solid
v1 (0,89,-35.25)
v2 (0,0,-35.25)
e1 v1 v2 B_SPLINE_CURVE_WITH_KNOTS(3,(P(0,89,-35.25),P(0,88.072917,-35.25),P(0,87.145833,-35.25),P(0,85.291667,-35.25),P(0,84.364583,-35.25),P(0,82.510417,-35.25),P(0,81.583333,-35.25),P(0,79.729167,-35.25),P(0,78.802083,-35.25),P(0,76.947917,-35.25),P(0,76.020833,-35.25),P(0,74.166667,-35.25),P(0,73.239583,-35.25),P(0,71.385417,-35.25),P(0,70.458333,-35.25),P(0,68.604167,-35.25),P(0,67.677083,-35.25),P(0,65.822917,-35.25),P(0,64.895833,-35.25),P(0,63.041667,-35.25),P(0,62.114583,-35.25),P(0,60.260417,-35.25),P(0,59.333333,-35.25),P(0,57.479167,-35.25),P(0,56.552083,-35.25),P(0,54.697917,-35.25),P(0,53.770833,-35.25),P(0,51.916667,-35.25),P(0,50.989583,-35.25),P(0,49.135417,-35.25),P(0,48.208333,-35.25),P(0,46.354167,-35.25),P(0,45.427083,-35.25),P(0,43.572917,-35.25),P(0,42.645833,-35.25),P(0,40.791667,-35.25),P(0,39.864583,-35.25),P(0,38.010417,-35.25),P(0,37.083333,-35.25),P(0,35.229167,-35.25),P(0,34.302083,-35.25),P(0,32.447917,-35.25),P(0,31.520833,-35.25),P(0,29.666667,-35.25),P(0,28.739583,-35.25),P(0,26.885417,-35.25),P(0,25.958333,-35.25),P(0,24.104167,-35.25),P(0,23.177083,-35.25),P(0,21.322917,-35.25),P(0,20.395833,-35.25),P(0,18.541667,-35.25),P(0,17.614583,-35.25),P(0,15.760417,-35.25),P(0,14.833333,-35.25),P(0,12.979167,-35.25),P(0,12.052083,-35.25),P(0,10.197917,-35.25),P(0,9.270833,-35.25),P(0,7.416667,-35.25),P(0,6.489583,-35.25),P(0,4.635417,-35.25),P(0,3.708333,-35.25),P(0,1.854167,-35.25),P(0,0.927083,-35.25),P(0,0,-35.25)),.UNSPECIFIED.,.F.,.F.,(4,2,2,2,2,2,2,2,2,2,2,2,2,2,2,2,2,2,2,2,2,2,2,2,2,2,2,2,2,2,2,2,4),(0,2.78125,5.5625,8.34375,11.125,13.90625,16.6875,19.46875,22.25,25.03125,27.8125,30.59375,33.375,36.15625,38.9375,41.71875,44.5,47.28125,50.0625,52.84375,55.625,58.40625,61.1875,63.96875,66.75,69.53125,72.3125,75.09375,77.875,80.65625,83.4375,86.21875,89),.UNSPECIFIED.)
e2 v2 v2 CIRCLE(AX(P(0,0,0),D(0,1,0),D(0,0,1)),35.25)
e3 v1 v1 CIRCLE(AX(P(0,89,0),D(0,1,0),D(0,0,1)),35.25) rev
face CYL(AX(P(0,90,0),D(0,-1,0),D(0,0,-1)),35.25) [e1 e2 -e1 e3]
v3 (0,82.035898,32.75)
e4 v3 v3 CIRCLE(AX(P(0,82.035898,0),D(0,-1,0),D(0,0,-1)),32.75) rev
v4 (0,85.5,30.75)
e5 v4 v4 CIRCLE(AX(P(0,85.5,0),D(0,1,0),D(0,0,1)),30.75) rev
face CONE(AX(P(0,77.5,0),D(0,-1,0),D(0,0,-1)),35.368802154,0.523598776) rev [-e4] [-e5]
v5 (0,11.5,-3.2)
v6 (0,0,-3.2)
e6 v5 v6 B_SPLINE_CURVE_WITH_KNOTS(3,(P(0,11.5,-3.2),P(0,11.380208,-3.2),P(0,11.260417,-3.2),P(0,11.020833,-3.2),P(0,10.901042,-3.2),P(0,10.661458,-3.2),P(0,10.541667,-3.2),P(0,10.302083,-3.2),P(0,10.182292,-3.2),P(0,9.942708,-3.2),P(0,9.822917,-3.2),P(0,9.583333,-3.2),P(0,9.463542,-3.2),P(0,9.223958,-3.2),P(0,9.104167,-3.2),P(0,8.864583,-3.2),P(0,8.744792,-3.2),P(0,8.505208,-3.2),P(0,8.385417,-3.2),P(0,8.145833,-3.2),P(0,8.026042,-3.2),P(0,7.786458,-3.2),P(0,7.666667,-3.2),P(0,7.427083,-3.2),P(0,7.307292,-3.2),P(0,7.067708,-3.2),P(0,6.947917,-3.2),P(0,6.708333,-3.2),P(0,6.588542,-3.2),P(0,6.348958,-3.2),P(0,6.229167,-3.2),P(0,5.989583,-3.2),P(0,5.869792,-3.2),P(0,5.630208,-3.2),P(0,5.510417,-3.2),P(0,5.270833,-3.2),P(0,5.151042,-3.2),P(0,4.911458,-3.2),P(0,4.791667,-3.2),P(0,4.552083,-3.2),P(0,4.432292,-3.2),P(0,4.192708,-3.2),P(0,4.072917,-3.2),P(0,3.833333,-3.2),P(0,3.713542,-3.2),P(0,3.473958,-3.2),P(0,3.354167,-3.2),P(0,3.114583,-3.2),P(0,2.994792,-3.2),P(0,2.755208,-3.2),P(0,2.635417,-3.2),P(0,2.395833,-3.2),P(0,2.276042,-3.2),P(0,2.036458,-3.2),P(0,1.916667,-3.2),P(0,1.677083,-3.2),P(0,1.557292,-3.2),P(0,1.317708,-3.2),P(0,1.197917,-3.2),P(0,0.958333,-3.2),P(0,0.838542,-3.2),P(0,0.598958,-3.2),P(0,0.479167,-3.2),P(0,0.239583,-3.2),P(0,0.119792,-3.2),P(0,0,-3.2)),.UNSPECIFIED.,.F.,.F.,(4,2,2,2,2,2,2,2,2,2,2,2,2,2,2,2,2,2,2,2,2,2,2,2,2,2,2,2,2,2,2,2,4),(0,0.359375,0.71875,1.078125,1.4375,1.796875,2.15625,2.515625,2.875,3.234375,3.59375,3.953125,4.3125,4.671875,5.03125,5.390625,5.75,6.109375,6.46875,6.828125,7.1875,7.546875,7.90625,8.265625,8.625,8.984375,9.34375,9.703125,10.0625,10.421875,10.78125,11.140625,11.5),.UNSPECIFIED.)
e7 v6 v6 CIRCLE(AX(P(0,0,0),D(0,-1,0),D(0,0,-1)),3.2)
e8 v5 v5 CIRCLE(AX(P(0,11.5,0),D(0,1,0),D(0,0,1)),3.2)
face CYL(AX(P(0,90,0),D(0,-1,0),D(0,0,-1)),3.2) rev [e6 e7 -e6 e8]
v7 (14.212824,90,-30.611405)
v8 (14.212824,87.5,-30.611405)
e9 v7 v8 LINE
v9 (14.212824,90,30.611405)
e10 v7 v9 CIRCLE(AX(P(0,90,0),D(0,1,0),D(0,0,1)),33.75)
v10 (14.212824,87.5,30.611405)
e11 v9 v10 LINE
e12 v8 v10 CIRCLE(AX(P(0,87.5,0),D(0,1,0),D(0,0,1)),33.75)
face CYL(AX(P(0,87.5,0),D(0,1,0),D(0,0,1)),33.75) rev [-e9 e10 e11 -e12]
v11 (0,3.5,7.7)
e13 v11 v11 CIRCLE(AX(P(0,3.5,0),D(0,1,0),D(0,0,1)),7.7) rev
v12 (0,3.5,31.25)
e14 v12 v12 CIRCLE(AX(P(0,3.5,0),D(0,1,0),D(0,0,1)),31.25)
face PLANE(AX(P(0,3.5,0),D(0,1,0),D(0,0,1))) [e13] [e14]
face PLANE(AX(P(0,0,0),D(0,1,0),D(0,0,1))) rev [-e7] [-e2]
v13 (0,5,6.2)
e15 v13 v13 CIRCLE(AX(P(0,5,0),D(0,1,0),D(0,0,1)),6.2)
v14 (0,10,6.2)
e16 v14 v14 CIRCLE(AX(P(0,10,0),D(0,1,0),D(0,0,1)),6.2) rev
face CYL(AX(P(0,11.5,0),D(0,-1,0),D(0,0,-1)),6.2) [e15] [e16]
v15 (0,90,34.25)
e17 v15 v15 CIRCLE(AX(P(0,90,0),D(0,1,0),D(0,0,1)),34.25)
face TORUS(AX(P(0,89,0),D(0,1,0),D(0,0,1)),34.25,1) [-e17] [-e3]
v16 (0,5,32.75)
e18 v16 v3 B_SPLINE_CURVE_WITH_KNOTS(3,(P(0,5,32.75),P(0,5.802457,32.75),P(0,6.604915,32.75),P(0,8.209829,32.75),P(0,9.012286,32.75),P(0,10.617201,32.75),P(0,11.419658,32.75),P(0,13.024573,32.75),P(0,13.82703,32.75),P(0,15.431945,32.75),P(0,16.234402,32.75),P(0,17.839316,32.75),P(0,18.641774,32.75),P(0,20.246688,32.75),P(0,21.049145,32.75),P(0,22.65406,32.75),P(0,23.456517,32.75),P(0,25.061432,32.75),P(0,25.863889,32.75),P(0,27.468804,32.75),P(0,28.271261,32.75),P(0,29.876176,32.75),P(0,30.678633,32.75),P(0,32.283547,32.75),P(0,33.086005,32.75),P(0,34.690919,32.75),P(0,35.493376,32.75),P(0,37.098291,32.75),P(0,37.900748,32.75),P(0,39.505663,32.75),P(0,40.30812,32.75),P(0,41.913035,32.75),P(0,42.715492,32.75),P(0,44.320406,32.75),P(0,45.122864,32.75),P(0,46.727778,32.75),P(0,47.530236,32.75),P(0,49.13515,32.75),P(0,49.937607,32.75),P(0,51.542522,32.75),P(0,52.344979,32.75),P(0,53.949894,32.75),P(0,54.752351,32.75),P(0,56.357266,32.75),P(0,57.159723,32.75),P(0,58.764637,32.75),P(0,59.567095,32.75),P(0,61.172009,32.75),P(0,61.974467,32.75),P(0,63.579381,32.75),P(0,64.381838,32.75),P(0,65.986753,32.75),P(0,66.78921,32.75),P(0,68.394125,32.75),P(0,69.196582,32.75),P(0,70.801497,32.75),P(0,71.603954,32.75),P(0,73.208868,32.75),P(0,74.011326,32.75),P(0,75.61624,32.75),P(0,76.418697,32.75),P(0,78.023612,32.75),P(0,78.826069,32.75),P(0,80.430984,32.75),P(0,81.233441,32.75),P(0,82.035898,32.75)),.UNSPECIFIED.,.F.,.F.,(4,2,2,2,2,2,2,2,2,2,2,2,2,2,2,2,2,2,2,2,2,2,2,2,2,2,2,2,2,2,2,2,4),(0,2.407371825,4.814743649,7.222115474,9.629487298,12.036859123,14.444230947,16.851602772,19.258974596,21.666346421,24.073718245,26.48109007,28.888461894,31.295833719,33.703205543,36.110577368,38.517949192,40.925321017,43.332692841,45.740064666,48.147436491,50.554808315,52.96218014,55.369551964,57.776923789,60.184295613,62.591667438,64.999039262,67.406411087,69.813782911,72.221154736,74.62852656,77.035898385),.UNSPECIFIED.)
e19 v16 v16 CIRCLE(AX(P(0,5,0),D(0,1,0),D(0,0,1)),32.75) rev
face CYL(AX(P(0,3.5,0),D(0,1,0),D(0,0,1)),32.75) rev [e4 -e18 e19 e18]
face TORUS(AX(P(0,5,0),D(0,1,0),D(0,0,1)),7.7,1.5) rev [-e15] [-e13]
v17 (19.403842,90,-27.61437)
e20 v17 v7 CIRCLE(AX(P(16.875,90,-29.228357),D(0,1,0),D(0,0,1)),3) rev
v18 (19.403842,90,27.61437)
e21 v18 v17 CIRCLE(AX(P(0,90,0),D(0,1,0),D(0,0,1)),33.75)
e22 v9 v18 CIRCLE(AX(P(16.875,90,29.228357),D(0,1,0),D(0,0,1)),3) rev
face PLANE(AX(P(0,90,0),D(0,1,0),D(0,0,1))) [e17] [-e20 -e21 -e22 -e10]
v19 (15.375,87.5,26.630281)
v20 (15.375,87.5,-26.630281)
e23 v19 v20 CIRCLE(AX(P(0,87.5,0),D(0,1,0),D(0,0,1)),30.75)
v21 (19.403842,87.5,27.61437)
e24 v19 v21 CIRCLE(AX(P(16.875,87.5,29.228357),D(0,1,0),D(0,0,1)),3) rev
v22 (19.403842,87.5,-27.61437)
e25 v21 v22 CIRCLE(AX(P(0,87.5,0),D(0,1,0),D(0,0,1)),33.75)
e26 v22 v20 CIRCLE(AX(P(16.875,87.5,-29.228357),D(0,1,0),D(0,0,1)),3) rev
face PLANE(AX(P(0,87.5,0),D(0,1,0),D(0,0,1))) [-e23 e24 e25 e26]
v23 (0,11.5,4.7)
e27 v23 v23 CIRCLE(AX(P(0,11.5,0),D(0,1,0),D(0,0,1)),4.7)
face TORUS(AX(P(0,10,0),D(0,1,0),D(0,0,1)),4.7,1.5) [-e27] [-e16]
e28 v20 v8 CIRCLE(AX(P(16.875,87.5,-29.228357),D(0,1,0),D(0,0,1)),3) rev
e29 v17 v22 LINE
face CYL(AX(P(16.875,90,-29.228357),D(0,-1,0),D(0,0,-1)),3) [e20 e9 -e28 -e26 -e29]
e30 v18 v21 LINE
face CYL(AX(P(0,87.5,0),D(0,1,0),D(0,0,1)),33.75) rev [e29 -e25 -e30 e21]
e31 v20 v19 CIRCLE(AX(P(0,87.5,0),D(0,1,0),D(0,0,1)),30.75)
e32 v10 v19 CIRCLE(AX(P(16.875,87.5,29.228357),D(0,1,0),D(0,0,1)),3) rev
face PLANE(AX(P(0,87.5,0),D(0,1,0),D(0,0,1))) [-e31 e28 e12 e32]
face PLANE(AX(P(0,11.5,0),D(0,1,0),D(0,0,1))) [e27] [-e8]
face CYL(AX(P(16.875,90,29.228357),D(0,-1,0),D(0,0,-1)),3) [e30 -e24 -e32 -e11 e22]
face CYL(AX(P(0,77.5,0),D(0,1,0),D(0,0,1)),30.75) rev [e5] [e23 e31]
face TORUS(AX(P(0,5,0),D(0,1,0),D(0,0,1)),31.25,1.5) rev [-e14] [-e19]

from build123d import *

# Parameters (mm, degrees)
ESQUISSE1_R             = 35.25
BOSS_EXTRU_1_DEPTH      = 90
CONG_1_R                = 1
ESQUISSE4_R             = 33.75
ENL_V_MAT_EXTRU_3_DEPTH = 2.5
ESQUISSE5_R             = 32.75
ENL_V_MAT_EXTRU_4_DEPTH = 84
ESQUISSE6_R             = 33.75
ESQUISSE6_R_2           = 30.75
BOSS_EXTRU_2_DEPTH      = 10
CHANFREIN1_SIZE         = 8
CHANFREIN1_SIZE_2       = 4.618802154
BOSS_EXTRU_3_START      = 2.5
BOSS_EXTRU_3_DEPTH      = 2.5
ESQUISSE8_R             = 6.2
BOSS_EXTRU_4_DEPTH      = 8
ESQUISSE2_R             = 3.2
ENL_V_MAT_EXTRU_1_DEPTH = 103.884036697
CONG_2_R                = 1.5


with BuildPart() as part:
    # Esquisse1 → Boss.-Extru.1 (new body)
    with BuildSketch(Plane(origin=(0, 0, 0), x_dir=(1, 0, 0), z_dir=(0, 1, 0))):
        with Locations(Location((0, 0, 0), (0, 0, 90))):
            Circle(ESQUISSE1_R)
    extrude(amount=BOSS_EXTRU_1_DEPTH)

    # Congé1
    cong_1_edges = [part.edges().sort_by_distance(p)[0] for p in [
        (0, 90, 35.25),
    ]]
    fillet(cong_1_edges, radius=CONG_1_R)

    # Esquisse4 → Enlèv. mat.-Extru.3 (cut)
    with BuildSketch(Plane(origin=(0, 90, 0), x_dir=(1, 0, 0), z_dir=(0, 1, 0))):
        with Locations(Location((0, 0, 0), (0, 0, 270))):
            Circle(ESQUISSE4_R)
    extrude(amount=-ENL_V_MAT_EXTRU_3_DEPTH, mode=Mode.SUBTRACT)

    # Esquisse5 → Enlèv. mat.-Extru.4 (cut)
    with BuildSketch(Plane(origin=(0, 87.5, 0), x_dir=(1, 0, 0), z_dir=(0, 1, 0))):
        with Locations(Location((0, 0, 0), (0, 0, 270))):
            Circle(ESQUISSE5_R)
    extrude(amount=-ENL_V_MAT_EXTRU_4_DEPTH, mode=Mode.SUBTRACT)

    # Esquisse6 → Boss.-Extru.2 (add)
    with BuildSketch(Plane(origin=(0, 87.5, 0), x_dir=(1, 0, 0), z_dir=(0, 1, 0))):
        with Locations(Location((0, 0, 0), (0, 0, 270))):
            Circle(ESQUISSE6_R)
        with Locations(Location((0, 0, 0), (0, 0, 270))):
            Circle(ESQUISSE6_R_2, mode=Mode.SUBTRACT)
    extrude(amount=-BOSS_EXTRU_2_DEPTH)

    # Chanfrein1
    # the kernel refuses this chamfer: 8, 4.618802154 mm, written as the material it takes off along each edge
    with BuildSketch(Plane(origin=(0, 77.5, 0), x_dir=(0, 0, 1), z_dir=(-1, 0, 0))) as chanfrein1_piece_1_section:
        Polygon((30.75, CHANFREIN1_SIZE), (30.75 + CHANFREIN1_SIZE_2, 0), (30.75, 0), align=None)
    chanfrein1_piece_1 = revolve(axis=Axis((0, 77.5, 0), (0, 1, 0)), mode=Mode.PRIVATE)
    chanfrein1_piece_1 = chanfrein1_piece_1 & Plane(origin=(0, 83.835682002, 0), x_dir=(0, 0, 1), z_dir=(0, 1, 0)) * Cylinder(32.75, 142, mode=Mode.PRIVATE)
    add(chanfrein1_piece_1, mode=Mode.SUBTRACT)

    # Esquisse7 → Boss.-Extru.3 (add)
    with BuildSketch(Plane(origin=(0, 87.5, 0), x_dir=(1, 0, 0), z_dir=(0, 1, 0)).offset(BOSS_EXTRU_3_START)):
        with BuildLine():
            ThreePointArc((14.212824392, 30.61140511), (15.375, 26.630281166), (19.403842275, 27.614369538))
            ThreePointArc((19.403842275, 27.614369538), (16.875, 29.228357378), (14.212824392, 30.61140511))
        make_face()
        with BuildLine():
            ThreePointArc((14.212824392, -30.61140511), (16.875, -29.228357378), (19.403842275, -27.614369538))
            ThreePointArc((19.403842275, -27.614369538), (15.375, -26.630281166), (14.212824392, -30.61140511))
        make_face()
    extrude(amount=-BOSS_EXTRU_3_DEPTH)

    # Esquisse8 → Boss.-Extru.4 (add)
    with BuildSketch(Plane(origin=(0, 3.5, 0), x_dir=(1, 0, 0), z_dir=(0, 1, 0))):
        with Locations(Location((0, 0, 0), (0, 0, 270))):
            Circle(ESQUISSE8_R)
    extrude(amount=BOSS_EXTRU_4_DEPTH)

    # Esquisse2 → Enlèv. mat.-Extru.1 (cut, through all)
    with BuildSketch(Plane.XZ):
        with Locations(Location((0, 0, 0), (0, 0, 270))):
            Circle(ESQUISSE2_R)
    extrude(amount=-ENL_V_MAT_EXTRU_1_DEPTH, mode=Mode.SUBTRACT)

    # Congé2
    cong_2_edges = [part.edges().sort_by_distance(p)[0] for p in [
        (0, 3.5, -32.75),
        (0, 3.5, -6.2),
        (0, 11.5, -6.2),
    ]]
    fillet(cong_2_edges, radius=CONG_2_R)


solid = part.part
